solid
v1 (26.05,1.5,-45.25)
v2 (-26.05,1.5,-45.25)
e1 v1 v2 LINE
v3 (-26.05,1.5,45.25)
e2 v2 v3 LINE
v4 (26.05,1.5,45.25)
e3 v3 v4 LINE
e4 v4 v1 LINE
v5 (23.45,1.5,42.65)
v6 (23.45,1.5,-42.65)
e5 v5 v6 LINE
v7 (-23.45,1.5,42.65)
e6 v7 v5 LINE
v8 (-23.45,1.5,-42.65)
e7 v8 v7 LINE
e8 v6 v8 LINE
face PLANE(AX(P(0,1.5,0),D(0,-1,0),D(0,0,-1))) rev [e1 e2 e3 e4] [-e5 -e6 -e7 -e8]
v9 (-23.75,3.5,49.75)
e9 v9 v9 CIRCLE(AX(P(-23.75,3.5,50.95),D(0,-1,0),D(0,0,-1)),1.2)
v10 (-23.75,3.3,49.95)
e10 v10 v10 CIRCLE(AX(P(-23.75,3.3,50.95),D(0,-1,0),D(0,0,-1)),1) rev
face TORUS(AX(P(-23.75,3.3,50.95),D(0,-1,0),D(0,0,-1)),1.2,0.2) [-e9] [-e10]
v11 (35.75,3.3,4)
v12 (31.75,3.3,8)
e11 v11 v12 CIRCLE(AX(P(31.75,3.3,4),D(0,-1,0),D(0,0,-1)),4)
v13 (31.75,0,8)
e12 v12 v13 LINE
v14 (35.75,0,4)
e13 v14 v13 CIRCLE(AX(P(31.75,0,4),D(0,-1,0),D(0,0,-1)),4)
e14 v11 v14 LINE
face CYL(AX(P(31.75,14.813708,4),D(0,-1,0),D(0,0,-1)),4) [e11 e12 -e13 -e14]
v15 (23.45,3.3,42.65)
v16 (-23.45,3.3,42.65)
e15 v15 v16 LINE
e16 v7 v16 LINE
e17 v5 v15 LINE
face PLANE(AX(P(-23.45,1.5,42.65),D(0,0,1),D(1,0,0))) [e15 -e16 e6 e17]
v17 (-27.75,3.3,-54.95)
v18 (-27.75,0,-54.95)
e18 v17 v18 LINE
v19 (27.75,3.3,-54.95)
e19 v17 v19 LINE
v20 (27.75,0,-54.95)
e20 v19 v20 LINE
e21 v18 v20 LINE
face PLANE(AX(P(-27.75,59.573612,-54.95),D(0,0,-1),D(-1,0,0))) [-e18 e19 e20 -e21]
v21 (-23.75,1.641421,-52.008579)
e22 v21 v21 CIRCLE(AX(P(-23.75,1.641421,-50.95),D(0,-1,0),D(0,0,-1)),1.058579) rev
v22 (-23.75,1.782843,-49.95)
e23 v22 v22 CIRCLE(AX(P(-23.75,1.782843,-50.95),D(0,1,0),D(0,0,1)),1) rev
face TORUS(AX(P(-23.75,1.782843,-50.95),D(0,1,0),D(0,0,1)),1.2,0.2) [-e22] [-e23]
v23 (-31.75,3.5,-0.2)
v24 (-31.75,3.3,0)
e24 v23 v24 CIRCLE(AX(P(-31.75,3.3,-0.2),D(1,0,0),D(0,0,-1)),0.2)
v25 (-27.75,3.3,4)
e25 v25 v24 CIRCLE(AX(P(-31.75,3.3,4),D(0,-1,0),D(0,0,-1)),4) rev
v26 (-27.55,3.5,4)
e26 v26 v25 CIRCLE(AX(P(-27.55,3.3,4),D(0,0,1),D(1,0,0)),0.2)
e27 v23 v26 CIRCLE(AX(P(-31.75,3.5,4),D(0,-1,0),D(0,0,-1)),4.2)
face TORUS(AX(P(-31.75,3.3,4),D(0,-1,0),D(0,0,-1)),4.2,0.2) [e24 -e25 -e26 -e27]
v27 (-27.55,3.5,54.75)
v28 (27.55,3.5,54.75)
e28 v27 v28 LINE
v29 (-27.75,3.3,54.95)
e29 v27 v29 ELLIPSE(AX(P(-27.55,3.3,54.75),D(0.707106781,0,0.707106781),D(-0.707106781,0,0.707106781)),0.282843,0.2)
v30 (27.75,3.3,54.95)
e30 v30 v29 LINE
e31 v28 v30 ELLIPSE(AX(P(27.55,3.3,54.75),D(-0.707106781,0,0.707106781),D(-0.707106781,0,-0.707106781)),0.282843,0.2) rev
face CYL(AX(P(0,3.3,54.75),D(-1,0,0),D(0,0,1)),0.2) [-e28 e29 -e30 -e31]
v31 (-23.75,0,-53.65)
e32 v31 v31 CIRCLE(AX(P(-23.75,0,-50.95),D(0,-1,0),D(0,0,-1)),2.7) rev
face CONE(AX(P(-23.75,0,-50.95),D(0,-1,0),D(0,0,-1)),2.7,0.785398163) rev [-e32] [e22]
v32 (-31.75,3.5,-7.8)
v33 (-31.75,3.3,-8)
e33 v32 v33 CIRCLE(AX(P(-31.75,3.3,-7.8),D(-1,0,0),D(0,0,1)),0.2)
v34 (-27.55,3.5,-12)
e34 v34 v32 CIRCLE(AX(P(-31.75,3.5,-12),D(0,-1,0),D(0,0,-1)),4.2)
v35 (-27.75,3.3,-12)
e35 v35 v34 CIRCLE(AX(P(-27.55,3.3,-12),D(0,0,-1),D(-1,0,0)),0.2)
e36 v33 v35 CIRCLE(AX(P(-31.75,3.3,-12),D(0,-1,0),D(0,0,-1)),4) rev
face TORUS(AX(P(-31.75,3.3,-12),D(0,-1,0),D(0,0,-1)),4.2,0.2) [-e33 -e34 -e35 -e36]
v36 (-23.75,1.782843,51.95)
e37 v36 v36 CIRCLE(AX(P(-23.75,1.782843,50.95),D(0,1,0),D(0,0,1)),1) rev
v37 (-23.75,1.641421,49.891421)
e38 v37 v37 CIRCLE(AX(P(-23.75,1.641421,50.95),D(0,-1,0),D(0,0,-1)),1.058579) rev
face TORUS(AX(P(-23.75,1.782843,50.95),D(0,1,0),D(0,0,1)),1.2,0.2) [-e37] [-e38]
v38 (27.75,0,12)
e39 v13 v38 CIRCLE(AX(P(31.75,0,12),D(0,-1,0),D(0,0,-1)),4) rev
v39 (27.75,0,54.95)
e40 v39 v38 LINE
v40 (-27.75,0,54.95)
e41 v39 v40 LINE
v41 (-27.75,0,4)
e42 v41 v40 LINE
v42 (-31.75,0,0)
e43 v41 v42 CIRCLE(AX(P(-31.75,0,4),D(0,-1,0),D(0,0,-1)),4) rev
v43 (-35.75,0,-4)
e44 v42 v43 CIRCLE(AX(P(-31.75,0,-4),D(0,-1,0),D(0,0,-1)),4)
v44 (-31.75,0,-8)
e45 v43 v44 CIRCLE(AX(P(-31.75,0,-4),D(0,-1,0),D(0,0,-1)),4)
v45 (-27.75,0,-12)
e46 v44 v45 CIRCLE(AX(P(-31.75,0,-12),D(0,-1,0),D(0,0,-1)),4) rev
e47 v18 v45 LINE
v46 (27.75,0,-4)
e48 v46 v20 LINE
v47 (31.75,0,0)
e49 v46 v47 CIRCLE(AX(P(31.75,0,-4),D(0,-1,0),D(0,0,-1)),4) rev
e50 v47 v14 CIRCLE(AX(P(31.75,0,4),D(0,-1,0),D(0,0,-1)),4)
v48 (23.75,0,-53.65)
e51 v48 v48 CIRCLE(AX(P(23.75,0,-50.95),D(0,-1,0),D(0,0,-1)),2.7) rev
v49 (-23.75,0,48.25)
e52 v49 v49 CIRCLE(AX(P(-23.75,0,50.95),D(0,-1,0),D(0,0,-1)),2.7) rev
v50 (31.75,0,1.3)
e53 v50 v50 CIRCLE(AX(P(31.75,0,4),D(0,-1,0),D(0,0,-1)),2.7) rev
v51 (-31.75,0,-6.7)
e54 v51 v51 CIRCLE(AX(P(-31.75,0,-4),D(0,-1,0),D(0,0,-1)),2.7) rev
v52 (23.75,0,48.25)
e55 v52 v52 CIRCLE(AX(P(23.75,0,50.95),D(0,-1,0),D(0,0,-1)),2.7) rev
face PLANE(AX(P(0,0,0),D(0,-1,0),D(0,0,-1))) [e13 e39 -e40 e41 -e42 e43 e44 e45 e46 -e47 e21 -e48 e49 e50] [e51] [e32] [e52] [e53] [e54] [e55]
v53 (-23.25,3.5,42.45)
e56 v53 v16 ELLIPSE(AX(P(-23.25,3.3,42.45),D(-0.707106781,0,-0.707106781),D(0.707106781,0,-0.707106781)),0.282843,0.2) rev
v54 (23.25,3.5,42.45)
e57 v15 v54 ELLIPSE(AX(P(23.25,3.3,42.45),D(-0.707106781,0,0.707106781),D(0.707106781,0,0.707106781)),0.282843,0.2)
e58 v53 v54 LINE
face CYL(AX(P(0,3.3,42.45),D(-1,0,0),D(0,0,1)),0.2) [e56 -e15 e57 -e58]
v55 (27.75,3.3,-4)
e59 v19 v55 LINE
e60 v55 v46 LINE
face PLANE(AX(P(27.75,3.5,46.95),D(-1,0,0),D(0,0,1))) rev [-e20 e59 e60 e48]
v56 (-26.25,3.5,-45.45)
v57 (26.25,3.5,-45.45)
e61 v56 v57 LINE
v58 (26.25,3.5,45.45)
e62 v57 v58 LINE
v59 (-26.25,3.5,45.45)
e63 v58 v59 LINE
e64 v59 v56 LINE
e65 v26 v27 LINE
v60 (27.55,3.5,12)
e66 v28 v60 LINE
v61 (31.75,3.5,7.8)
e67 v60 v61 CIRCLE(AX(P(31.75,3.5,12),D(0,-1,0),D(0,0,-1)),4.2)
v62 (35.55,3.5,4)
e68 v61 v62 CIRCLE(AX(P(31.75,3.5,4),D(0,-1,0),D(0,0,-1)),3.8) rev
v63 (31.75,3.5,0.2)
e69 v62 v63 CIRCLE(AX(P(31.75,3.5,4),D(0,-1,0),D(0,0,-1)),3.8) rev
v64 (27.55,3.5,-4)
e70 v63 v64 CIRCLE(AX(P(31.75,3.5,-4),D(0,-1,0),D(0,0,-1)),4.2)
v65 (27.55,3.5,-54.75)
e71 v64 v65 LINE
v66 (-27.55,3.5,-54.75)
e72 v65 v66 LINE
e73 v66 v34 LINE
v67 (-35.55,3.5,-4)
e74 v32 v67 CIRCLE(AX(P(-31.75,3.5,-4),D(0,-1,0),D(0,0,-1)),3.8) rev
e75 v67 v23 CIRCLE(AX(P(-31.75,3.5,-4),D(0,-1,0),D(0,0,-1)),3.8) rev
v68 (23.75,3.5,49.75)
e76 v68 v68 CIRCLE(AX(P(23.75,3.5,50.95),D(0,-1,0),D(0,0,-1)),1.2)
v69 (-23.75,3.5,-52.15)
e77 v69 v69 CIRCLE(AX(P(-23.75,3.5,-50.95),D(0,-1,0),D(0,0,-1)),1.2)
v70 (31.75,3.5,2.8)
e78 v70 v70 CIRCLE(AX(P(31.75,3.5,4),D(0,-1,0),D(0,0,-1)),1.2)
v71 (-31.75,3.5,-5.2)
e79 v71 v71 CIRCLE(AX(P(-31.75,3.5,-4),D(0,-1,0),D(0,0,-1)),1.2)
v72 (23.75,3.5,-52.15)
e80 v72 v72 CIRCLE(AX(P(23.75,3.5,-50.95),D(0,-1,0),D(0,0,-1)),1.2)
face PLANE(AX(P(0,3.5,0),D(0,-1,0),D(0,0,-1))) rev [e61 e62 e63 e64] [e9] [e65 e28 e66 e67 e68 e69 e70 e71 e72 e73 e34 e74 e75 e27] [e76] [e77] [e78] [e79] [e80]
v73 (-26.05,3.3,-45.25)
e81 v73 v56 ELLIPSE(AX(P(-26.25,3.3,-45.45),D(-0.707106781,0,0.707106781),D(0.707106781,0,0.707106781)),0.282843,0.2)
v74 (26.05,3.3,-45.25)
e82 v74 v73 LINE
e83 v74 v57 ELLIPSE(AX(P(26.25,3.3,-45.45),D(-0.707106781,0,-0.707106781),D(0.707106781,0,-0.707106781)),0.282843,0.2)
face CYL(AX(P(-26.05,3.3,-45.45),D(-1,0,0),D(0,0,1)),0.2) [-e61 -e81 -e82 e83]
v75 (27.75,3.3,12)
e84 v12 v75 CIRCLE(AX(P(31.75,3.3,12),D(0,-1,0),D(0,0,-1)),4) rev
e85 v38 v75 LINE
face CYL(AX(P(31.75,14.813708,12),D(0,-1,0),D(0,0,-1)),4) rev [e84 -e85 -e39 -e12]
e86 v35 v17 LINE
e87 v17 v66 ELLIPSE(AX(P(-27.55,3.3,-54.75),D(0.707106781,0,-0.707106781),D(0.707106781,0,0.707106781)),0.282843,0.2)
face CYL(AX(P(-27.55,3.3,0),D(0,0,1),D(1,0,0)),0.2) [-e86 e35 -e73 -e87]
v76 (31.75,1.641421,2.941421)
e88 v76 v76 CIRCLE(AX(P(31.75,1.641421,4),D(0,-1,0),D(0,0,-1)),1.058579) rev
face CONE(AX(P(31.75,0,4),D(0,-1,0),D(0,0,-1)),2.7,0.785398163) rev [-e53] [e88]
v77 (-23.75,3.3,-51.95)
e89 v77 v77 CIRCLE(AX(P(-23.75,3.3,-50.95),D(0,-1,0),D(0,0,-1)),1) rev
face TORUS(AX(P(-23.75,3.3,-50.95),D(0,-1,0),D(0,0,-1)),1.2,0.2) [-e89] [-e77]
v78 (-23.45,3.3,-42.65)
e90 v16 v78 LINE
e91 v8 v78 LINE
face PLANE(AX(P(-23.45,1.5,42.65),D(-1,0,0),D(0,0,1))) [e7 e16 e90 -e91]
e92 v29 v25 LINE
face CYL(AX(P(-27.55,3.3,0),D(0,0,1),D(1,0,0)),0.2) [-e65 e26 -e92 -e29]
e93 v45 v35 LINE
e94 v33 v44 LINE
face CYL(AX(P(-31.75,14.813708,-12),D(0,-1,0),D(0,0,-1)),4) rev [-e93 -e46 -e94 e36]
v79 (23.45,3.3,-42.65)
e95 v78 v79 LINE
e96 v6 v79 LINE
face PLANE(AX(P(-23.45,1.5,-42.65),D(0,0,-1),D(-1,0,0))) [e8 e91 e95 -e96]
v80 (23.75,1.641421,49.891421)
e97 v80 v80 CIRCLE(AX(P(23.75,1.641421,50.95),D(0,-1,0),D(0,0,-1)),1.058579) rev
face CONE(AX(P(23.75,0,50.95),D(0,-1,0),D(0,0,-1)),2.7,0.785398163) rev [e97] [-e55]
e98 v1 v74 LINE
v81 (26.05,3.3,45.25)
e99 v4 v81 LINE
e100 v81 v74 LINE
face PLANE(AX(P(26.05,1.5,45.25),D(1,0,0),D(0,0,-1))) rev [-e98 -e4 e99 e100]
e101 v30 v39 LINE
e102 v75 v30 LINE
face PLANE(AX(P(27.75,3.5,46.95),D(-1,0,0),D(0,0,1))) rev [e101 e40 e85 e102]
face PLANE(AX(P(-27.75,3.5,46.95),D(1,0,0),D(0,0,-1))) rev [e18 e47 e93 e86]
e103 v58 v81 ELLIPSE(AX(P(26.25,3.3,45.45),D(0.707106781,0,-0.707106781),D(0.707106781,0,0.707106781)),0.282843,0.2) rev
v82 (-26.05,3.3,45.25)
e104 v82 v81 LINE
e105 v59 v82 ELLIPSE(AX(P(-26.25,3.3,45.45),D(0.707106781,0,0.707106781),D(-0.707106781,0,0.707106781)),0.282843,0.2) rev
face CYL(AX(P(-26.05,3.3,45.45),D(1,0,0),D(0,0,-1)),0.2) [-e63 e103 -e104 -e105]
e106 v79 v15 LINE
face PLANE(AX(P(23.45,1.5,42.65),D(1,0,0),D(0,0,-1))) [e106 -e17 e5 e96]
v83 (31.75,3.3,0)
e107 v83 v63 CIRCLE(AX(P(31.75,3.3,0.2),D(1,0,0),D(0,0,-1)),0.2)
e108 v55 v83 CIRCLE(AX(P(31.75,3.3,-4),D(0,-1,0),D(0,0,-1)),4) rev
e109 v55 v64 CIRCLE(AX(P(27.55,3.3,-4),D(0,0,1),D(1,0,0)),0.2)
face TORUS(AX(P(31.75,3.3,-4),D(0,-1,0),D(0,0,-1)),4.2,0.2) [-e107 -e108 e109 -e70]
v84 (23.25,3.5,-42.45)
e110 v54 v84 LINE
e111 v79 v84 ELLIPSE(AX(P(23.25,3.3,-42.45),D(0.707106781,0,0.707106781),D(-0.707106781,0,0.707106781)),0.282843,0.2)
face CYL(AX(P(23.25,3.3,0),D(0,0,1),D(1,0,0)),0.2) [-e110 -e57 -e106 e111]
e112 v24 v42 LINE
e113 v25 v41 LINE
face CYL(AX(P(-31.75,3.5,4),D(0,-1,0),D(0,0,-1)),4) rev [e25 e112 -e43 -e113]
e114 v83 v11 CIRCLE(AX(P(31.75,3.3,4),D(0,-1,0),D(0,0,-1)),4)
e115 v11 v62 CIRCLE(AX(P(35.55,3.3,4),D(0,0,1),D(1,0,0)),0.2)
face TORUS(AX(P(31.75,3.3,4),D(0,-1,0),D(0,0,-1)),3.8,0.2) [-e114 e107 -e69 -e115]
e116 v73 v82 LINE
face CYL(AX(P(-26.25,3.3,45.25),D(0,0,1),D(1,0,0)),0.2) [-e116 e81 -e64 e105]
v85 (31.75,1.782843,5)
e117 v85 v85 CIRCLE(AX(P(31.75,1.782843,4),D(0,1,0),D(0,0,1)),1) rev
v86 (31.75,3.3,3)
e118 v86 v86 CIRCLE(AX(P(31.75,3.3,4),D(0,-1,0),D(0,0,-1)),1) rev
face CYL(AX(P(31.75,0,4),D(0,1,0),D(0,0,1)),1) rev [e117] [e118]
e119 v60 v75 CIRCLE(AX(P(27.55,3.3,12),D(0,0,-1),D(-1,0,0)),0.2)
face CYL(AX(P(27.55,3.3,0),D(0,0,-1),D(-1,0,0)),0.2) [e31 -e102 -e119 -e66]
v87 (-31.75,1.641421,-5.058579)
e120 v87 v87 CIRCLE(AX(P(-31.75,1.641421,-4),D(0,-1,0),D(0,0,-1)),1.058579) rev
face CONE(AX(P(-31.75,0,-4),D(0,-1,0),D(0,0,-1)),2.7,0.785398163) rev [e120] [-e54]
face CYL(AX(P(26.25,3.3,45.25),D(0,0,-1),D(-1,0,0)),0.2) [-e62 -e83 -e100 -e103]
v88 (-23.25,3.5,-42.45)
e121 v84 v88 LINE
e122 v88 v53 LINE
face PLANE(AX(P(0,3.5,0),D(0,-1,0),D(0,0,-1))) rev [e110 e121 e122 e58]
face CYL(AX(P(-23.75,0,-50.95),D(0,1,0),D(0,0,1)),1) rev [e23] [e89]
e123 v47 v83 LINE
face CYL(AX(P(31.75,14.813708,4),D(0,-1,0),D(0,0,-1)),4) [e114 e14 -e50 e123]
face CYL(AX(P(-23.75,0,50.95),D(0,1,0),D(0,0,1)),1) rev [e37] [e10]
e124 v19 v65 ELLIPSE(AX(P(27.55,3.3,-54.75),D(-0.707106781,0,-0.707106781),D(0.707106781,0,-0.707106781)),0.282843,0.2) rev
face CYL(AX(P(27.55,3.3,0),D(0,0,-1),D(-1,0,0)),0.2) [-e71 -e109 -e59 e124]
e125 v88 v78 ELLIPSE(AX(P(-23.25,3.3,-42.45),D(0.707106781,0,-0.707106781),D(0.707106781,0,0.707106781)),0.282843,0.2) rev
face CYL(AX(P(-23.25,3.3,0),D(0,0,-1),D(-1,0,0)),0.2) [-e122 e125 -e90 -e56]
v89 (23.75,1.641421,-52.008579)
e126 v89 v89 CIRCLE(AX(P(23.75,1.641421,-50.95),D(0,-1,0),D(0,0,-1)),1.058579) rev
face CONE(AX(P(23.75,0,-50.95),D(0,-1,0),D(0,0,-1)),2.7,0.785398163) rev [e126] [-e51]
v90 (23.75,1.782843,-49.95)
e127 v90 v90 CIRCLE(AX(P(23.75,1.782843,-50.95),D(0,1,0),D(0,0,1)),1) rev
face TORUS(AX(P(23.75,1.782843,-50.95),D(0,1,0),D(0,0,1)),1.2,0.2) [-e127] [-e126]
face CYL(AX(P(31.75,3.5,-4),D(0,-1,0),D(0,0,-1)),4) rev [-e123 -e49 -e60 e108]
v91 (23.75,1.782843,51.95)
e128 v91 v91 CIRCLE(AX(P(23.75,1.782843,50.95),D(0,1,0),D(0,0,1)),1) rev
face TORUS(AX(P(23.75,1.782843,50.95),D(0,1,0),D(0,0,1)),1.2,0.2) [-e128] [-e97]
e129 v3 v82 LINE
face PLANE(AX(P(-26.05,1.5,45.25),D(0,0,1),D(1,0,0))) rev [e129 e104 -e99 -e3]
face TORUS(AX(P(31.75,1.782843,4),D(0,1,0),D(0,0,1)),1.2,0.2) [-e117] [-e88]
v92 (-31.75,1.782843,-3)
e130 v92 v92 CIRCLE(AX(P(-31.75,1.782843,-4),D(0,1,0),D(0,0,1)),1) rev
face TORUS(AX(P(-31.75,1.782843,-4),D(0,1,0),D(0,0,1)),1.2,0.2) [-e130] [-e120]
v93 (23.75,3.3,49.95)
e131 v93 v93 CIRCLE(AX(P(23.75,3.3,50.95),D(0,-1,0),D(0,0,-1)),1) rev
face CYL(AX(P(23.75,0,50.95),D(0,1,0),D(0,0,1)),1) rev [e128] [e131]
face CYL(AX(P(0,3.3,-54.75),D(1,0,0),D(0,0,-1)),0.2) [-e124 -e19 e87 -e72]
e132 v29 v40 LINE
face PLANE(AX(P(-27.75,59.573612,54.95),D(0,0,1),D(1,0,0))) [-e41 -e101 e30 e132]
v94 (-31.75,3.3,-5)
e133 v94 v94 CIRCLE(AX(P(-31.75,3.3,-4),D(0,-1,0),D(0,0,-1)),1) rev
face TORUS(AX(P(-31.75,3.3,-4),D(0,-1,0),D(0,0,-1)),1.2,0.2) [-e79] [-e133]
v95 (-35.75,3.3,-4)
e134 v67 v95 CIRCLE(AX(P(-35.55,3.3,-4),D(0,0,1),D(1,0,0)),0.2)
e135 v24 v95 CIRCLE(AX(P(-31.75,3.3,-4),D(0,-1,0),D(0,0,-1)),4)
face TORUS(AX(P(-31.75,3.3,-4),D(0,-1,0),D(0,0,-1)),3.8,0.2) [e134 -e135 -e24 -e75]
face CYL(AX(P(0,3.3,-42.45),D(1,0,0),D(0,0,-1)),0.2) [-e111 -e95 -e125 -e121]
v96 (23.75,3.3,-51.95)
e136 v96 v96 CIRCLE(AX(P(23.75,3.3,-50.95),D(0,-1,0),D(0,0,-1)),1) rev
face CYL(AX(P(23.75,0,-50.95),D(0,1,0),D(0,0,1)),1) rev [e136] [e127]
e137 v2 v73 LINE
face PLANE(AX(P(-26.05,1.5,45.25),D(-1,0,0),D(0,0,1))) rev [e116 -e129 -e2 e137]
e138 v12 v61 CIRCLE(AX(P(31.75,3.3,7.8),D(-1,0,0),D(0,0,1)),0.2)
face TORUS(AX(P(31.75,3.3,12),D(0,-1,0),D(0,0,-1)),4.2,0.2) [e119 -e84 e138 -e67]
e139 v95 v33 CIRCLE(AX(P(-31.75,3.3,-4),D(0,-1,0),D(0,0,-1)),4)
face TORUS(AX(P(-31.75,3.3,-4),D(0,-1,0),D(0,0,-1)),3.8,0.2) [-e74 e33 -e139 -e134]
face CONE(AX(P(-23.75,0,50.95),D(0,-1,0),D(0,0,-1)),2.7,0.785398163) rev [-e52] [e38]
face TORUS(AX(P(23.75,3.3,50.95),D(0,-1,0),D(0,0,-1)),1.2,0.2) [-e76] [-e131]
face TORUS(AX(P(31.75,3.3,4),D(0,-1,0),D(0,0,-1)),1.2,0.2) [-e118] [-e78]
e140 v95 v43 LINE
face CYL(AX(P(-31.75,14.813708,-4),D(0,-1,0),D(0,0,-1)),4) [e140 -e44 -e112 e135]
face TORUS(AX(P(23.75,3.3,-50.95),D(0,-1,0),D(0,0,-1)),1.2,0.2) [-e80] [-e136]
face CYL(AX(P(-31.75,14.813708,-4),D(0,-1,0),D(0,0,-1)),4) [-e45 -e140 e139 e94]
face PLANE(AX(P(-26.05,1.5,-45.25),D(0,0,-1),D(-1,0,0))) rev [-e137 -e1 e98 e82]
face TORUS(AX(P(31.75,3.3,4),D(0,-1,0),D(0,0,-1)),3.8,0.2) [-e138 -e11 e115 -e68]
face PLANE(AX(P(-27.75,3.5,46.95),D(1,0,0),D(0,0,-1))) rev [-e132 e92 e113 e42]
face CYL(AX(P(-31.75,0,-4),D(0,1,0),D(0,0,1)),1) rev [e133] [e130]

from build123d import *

# Parameters (mm, degrees)
SKIZZE1_W                       = 55.5
SKIZZE1_H                       = 93.9
AUFSATZ_LINEAR_AUSTRAGEN1_DEPTH = 3.5
SKIZZE2_W                       = 52.1
SKIZZE2_H                       = 90.5
SKIZZE2_W_2                     = 46.9
SKIZZE2_H_2                     = 85.3
SCHNITT_LINEAR_AUSTRAGEN1_DEPTH = 2
SKIZZE3_W                       = 55.5
SKIZZE3_H                       = 8
AUFSATZ_LINEAR_AUSTRAGEN2_DEPTH = 3.5
SKIZZE5_W                       = 8
SKIZZE5_H                       = 8
AUFSATZ_LINEAR_AUSTRAGEN3_DEPTH = 3.5
SKIZZE4_R                       = 1
SCHNITT_LINEAR_AUSTRAGEN2_DEPTH = 66.649181259
FASE1_SIZE                      = 1.7
VERRUNDUNG2_DEPTH               = 3.5
VERRUNDUNG2_2_DEPTH             = 3.5
VERRUNDUNG1_R                   = 0.2


with BuildPart() as part:
    # Skizze1 → Aufsatz-Linear austragen1 (new body)
    with BuildSketch(Plane(origin=(0, 0, 0), x_dir=(1, 0, 0), z_dir=(0, 1, 0))):
        Rectangle(SKIZZE1_W, SKIZZE1_H)
    extrude(amount=AUFSATZ_LINEAR_AUSTRAGEN1_DEPTH)

    # Skizze2 → Schnitt-Linear austragen1 (cut)
    with BuildSketch(Plane(origin=(0, 3.5, 0), x_dir=(1, 0, 0), z_dir=(0, 1, 0))):
        Rectangle(SKIZZE2_W, SKIZZE2_H)
        Rectangle(SKIZZE2_W_2, SKIZZE2_H_2, mode=Mode.SUBTRACT)
    extrude(amount=-SCHNITT_LINEAR_AUSTRAGEN1_DEPTH, mode=Mode.SUBTRACT)

    # Skizze3 → Aufsatz-Linear austragen2 (add)
    with BuildSketch(Plane.XZ):
        with Locations((0, 50.95)):
            Rectangle(SKIZZE3_W, SKIZZE3_H)
        with Locations((0, -50.95)):
            Rectangle(SKIZZE3_W, SKIZZE3_H)
    extrude(amount=-AUFSATZ_LINEAR_AUSTRAGEN2_DEPTH)

    # Skizze5 → Aufsatz-Linear austragen3 (add)
    with BuildSketch(Plane.XZ):
        with Locations((31.75, 4)):
            Rectangle(SKIZZE5_W, SKIZZE5_H)
        with Locations((-31.75, -4)):
            Rectangle(SKIZZE5_W, SKIZZE5_H)
    extrude(amount=-AUFSATZ_LINEAR_AUSTRAGEN3_DEPTH)

    # Skizze4 → Schnitt-Linear austragen2 (cut, through all)
    with BuildSketch(Plane(origin=(0, 3.5, 0), x_dir=(1, 0, 0), z_dir=(0, 1, 0))):
        with Locations(Location((-23.75, 50.95, 0), (0, 0, 270))):
            Circle(SKIZZE4_R)
        with Locations(Location((23.75, 50.95, 0), (0, 0, 90))):
            Circle(SKIZZE4_R)
        with Locations(Location((-31.75, 4, 0), (0, 0, 270))):
            Circle(SKIZZE4_R)
        with Locations(Location((31.75, -4, 0), (0, 0, 270))):
            Circle(SKIZZE4_R)
        with Locations(Location((23.75, -50.95, 0), (0, 0, 270))):
            Circle(SKIZZE4_R)
        with Locations(Location((-23.75, -50.95, 0), (0, 0, 90))):
            Circle(SKIZZE4_R)
    extrude(amount=-SCHNITT_LINEAR_AUSTRAGEN2_DEPTH, mode=Mode.SUBTRACT)

    # Fase1
    fase1_edges = [part.edges().sort_by_distance(p)[0] for p in [
        (-23.75, 0, 51.95),
        (23.75, 0, -49.95),
        (-23.75, 0, -51.95),
        (23.75, 0, 49.95),
        (31.75, 0, 3),
        (-31.75, 0, -5),
    ]]
    chamfer(fase1_edges, length=FASE1_SIZE)

    # Verrundung2: read off the stored shape, not the designer's step
    # Verrundung2 outline → Verrundung2 (cut)
    with BuildSketch(Plane(origin=(0, 0, 0), x_dir=(1, 0, 0), z_dir=(0, 1, 0))):
        with BuildLine():
            ThreePointArc((31.75, 0), (34.578427125, -1.171572875), (35.75, -4))
            Line((35.75, -4), (35.75, 0))
            Line((35.75, 0), (31.75, 0))
        make_face()
        with BuildLine():
            ThreePointArc((35.75, -4), (34.578427125, -6.828427125), (31.75, -8))
            Line((31.75, -8), (35.75, -8))
            Line((35.75, -8), (35.75, -4))
        make_face()
        with BuildLine():
            ThreePointArc((-31.75, 0), (-34.578427125, 1.171572875), (-35.75, 4))
            Line((-35.75, 4), (-35.75, 0))
            Line((-35.75, 0), (-31.75, 0))
        make_face()
        with BuildLine():
            ThreePointArc((-35.75, 4), (-34.578427125, 6.828427125), (-31.75, 8))
            Line((-31.75, 8), (-35.75, 8))
            Line((-35.75, 8), (-35.75, 4))
        make_face()
    extrude(amount=VERRUNDUNG2_DEPTH, mode=Mode.SUBTRACT)

    # Verrundung2 2 outline → Verrundung2 2 (add)
    with BuildSketch(Plane(origin=(0, 0, 0), x_dir=(1, 0, 0), z_dir=(0, 1, 0))):
        with BuildLine():
            Line((27.75, -8), (27.75, -12))
            ThreePointArc((27.75, -12), (28.921572875, -9.171572875), (31.75, -8))
            Line((31.75, -8), (27.75, -8))
        make_face()
        with BuildLine():
            Line((27.75, 0), (31.75, 0))
            ThreePointArc((31.75, 0), (28.921572875, 1.171572875), (27.75, 4))
            Line((27.75, 4), (27.75, 0))
        make_face()
        with BuildLine():
            Line((-27.75, 8), (-27.75, 12))
            ThreePointArc((-27.75, 12), (-28.921572875, 9.171572875), (-31.75, 8))
            Line((-31.75, 8), (-27.75, 8))
        make_face()
        with BuildLine():
            Line((-27.75, 0), (-31.75, 0))
            ThreePointArc((-31.75, 0), (-28.921572875, -1.171572875), (-27.75, -4))
            Line((-27.75, -4), (-27.75, 0))
        make_face()
    extrude(amount=VERRUNDUNG2_2_DEPTH)

    # Verrundung1
    verrundung1_edges = [part.edges().sort_by_distance(p)[0] for p in [
        (-23.75, 3.5, 51.95),
        (23.75, 3.5, -49.95),
        (-23.75, 3.5, -51.95),
        (23.75, 3.5, 49.95),
        (-23.75, 1.7, 51.95),
        (23.75, 1.7, 49.95),
        (31.75, 1.7, 3),
        (-31.75, 1.7, -5),
        (-23.75, 1.7, -51.95),
        (23.75, 1.7, -49.95),
        (-27.75, 3.5, -33.475),
        (27.75, 3.5, -29.475),
        (-27.75, 3.5, 29.475),
        (-34.578427125, 3.5, -6.828427125),
        (-34.578427125, 3.5, -1.171572875),
        (34.578427125, 3.5, 6.828427125),
        (34.578427125, 3.5, 1.171572875),
        (28.921572875, 3.5, 9.171572875),
        (28.921572875, 3.5, -1.171572875),
        (-28.921572875, 3.5, 1.171572875),
        (-28.921572875, 3.5, -9.171572875),
        (26.05, 3.5, 0),
        (0, 3.5, -45.25),
        (-26.05, 3.5, 0),
        (0, 3.5, 45.25),
        (23.45, 3.5, 0),
        (0, 3.5, 42.65),
        (-23.45, 3.5, 0),
        (0, 3.5, -42.65),
        (0, 3.5, 54.95),
        (27.75, 3.5, 33.475),
        (0, 3.5, -54.95),
        (31.75, 3.5, 3),
        (-31.75, 3.5, -5),
    ]]
    fillet(verrundung1_edges, radius=VERRUNDUNG1_R)


solid = part.part
